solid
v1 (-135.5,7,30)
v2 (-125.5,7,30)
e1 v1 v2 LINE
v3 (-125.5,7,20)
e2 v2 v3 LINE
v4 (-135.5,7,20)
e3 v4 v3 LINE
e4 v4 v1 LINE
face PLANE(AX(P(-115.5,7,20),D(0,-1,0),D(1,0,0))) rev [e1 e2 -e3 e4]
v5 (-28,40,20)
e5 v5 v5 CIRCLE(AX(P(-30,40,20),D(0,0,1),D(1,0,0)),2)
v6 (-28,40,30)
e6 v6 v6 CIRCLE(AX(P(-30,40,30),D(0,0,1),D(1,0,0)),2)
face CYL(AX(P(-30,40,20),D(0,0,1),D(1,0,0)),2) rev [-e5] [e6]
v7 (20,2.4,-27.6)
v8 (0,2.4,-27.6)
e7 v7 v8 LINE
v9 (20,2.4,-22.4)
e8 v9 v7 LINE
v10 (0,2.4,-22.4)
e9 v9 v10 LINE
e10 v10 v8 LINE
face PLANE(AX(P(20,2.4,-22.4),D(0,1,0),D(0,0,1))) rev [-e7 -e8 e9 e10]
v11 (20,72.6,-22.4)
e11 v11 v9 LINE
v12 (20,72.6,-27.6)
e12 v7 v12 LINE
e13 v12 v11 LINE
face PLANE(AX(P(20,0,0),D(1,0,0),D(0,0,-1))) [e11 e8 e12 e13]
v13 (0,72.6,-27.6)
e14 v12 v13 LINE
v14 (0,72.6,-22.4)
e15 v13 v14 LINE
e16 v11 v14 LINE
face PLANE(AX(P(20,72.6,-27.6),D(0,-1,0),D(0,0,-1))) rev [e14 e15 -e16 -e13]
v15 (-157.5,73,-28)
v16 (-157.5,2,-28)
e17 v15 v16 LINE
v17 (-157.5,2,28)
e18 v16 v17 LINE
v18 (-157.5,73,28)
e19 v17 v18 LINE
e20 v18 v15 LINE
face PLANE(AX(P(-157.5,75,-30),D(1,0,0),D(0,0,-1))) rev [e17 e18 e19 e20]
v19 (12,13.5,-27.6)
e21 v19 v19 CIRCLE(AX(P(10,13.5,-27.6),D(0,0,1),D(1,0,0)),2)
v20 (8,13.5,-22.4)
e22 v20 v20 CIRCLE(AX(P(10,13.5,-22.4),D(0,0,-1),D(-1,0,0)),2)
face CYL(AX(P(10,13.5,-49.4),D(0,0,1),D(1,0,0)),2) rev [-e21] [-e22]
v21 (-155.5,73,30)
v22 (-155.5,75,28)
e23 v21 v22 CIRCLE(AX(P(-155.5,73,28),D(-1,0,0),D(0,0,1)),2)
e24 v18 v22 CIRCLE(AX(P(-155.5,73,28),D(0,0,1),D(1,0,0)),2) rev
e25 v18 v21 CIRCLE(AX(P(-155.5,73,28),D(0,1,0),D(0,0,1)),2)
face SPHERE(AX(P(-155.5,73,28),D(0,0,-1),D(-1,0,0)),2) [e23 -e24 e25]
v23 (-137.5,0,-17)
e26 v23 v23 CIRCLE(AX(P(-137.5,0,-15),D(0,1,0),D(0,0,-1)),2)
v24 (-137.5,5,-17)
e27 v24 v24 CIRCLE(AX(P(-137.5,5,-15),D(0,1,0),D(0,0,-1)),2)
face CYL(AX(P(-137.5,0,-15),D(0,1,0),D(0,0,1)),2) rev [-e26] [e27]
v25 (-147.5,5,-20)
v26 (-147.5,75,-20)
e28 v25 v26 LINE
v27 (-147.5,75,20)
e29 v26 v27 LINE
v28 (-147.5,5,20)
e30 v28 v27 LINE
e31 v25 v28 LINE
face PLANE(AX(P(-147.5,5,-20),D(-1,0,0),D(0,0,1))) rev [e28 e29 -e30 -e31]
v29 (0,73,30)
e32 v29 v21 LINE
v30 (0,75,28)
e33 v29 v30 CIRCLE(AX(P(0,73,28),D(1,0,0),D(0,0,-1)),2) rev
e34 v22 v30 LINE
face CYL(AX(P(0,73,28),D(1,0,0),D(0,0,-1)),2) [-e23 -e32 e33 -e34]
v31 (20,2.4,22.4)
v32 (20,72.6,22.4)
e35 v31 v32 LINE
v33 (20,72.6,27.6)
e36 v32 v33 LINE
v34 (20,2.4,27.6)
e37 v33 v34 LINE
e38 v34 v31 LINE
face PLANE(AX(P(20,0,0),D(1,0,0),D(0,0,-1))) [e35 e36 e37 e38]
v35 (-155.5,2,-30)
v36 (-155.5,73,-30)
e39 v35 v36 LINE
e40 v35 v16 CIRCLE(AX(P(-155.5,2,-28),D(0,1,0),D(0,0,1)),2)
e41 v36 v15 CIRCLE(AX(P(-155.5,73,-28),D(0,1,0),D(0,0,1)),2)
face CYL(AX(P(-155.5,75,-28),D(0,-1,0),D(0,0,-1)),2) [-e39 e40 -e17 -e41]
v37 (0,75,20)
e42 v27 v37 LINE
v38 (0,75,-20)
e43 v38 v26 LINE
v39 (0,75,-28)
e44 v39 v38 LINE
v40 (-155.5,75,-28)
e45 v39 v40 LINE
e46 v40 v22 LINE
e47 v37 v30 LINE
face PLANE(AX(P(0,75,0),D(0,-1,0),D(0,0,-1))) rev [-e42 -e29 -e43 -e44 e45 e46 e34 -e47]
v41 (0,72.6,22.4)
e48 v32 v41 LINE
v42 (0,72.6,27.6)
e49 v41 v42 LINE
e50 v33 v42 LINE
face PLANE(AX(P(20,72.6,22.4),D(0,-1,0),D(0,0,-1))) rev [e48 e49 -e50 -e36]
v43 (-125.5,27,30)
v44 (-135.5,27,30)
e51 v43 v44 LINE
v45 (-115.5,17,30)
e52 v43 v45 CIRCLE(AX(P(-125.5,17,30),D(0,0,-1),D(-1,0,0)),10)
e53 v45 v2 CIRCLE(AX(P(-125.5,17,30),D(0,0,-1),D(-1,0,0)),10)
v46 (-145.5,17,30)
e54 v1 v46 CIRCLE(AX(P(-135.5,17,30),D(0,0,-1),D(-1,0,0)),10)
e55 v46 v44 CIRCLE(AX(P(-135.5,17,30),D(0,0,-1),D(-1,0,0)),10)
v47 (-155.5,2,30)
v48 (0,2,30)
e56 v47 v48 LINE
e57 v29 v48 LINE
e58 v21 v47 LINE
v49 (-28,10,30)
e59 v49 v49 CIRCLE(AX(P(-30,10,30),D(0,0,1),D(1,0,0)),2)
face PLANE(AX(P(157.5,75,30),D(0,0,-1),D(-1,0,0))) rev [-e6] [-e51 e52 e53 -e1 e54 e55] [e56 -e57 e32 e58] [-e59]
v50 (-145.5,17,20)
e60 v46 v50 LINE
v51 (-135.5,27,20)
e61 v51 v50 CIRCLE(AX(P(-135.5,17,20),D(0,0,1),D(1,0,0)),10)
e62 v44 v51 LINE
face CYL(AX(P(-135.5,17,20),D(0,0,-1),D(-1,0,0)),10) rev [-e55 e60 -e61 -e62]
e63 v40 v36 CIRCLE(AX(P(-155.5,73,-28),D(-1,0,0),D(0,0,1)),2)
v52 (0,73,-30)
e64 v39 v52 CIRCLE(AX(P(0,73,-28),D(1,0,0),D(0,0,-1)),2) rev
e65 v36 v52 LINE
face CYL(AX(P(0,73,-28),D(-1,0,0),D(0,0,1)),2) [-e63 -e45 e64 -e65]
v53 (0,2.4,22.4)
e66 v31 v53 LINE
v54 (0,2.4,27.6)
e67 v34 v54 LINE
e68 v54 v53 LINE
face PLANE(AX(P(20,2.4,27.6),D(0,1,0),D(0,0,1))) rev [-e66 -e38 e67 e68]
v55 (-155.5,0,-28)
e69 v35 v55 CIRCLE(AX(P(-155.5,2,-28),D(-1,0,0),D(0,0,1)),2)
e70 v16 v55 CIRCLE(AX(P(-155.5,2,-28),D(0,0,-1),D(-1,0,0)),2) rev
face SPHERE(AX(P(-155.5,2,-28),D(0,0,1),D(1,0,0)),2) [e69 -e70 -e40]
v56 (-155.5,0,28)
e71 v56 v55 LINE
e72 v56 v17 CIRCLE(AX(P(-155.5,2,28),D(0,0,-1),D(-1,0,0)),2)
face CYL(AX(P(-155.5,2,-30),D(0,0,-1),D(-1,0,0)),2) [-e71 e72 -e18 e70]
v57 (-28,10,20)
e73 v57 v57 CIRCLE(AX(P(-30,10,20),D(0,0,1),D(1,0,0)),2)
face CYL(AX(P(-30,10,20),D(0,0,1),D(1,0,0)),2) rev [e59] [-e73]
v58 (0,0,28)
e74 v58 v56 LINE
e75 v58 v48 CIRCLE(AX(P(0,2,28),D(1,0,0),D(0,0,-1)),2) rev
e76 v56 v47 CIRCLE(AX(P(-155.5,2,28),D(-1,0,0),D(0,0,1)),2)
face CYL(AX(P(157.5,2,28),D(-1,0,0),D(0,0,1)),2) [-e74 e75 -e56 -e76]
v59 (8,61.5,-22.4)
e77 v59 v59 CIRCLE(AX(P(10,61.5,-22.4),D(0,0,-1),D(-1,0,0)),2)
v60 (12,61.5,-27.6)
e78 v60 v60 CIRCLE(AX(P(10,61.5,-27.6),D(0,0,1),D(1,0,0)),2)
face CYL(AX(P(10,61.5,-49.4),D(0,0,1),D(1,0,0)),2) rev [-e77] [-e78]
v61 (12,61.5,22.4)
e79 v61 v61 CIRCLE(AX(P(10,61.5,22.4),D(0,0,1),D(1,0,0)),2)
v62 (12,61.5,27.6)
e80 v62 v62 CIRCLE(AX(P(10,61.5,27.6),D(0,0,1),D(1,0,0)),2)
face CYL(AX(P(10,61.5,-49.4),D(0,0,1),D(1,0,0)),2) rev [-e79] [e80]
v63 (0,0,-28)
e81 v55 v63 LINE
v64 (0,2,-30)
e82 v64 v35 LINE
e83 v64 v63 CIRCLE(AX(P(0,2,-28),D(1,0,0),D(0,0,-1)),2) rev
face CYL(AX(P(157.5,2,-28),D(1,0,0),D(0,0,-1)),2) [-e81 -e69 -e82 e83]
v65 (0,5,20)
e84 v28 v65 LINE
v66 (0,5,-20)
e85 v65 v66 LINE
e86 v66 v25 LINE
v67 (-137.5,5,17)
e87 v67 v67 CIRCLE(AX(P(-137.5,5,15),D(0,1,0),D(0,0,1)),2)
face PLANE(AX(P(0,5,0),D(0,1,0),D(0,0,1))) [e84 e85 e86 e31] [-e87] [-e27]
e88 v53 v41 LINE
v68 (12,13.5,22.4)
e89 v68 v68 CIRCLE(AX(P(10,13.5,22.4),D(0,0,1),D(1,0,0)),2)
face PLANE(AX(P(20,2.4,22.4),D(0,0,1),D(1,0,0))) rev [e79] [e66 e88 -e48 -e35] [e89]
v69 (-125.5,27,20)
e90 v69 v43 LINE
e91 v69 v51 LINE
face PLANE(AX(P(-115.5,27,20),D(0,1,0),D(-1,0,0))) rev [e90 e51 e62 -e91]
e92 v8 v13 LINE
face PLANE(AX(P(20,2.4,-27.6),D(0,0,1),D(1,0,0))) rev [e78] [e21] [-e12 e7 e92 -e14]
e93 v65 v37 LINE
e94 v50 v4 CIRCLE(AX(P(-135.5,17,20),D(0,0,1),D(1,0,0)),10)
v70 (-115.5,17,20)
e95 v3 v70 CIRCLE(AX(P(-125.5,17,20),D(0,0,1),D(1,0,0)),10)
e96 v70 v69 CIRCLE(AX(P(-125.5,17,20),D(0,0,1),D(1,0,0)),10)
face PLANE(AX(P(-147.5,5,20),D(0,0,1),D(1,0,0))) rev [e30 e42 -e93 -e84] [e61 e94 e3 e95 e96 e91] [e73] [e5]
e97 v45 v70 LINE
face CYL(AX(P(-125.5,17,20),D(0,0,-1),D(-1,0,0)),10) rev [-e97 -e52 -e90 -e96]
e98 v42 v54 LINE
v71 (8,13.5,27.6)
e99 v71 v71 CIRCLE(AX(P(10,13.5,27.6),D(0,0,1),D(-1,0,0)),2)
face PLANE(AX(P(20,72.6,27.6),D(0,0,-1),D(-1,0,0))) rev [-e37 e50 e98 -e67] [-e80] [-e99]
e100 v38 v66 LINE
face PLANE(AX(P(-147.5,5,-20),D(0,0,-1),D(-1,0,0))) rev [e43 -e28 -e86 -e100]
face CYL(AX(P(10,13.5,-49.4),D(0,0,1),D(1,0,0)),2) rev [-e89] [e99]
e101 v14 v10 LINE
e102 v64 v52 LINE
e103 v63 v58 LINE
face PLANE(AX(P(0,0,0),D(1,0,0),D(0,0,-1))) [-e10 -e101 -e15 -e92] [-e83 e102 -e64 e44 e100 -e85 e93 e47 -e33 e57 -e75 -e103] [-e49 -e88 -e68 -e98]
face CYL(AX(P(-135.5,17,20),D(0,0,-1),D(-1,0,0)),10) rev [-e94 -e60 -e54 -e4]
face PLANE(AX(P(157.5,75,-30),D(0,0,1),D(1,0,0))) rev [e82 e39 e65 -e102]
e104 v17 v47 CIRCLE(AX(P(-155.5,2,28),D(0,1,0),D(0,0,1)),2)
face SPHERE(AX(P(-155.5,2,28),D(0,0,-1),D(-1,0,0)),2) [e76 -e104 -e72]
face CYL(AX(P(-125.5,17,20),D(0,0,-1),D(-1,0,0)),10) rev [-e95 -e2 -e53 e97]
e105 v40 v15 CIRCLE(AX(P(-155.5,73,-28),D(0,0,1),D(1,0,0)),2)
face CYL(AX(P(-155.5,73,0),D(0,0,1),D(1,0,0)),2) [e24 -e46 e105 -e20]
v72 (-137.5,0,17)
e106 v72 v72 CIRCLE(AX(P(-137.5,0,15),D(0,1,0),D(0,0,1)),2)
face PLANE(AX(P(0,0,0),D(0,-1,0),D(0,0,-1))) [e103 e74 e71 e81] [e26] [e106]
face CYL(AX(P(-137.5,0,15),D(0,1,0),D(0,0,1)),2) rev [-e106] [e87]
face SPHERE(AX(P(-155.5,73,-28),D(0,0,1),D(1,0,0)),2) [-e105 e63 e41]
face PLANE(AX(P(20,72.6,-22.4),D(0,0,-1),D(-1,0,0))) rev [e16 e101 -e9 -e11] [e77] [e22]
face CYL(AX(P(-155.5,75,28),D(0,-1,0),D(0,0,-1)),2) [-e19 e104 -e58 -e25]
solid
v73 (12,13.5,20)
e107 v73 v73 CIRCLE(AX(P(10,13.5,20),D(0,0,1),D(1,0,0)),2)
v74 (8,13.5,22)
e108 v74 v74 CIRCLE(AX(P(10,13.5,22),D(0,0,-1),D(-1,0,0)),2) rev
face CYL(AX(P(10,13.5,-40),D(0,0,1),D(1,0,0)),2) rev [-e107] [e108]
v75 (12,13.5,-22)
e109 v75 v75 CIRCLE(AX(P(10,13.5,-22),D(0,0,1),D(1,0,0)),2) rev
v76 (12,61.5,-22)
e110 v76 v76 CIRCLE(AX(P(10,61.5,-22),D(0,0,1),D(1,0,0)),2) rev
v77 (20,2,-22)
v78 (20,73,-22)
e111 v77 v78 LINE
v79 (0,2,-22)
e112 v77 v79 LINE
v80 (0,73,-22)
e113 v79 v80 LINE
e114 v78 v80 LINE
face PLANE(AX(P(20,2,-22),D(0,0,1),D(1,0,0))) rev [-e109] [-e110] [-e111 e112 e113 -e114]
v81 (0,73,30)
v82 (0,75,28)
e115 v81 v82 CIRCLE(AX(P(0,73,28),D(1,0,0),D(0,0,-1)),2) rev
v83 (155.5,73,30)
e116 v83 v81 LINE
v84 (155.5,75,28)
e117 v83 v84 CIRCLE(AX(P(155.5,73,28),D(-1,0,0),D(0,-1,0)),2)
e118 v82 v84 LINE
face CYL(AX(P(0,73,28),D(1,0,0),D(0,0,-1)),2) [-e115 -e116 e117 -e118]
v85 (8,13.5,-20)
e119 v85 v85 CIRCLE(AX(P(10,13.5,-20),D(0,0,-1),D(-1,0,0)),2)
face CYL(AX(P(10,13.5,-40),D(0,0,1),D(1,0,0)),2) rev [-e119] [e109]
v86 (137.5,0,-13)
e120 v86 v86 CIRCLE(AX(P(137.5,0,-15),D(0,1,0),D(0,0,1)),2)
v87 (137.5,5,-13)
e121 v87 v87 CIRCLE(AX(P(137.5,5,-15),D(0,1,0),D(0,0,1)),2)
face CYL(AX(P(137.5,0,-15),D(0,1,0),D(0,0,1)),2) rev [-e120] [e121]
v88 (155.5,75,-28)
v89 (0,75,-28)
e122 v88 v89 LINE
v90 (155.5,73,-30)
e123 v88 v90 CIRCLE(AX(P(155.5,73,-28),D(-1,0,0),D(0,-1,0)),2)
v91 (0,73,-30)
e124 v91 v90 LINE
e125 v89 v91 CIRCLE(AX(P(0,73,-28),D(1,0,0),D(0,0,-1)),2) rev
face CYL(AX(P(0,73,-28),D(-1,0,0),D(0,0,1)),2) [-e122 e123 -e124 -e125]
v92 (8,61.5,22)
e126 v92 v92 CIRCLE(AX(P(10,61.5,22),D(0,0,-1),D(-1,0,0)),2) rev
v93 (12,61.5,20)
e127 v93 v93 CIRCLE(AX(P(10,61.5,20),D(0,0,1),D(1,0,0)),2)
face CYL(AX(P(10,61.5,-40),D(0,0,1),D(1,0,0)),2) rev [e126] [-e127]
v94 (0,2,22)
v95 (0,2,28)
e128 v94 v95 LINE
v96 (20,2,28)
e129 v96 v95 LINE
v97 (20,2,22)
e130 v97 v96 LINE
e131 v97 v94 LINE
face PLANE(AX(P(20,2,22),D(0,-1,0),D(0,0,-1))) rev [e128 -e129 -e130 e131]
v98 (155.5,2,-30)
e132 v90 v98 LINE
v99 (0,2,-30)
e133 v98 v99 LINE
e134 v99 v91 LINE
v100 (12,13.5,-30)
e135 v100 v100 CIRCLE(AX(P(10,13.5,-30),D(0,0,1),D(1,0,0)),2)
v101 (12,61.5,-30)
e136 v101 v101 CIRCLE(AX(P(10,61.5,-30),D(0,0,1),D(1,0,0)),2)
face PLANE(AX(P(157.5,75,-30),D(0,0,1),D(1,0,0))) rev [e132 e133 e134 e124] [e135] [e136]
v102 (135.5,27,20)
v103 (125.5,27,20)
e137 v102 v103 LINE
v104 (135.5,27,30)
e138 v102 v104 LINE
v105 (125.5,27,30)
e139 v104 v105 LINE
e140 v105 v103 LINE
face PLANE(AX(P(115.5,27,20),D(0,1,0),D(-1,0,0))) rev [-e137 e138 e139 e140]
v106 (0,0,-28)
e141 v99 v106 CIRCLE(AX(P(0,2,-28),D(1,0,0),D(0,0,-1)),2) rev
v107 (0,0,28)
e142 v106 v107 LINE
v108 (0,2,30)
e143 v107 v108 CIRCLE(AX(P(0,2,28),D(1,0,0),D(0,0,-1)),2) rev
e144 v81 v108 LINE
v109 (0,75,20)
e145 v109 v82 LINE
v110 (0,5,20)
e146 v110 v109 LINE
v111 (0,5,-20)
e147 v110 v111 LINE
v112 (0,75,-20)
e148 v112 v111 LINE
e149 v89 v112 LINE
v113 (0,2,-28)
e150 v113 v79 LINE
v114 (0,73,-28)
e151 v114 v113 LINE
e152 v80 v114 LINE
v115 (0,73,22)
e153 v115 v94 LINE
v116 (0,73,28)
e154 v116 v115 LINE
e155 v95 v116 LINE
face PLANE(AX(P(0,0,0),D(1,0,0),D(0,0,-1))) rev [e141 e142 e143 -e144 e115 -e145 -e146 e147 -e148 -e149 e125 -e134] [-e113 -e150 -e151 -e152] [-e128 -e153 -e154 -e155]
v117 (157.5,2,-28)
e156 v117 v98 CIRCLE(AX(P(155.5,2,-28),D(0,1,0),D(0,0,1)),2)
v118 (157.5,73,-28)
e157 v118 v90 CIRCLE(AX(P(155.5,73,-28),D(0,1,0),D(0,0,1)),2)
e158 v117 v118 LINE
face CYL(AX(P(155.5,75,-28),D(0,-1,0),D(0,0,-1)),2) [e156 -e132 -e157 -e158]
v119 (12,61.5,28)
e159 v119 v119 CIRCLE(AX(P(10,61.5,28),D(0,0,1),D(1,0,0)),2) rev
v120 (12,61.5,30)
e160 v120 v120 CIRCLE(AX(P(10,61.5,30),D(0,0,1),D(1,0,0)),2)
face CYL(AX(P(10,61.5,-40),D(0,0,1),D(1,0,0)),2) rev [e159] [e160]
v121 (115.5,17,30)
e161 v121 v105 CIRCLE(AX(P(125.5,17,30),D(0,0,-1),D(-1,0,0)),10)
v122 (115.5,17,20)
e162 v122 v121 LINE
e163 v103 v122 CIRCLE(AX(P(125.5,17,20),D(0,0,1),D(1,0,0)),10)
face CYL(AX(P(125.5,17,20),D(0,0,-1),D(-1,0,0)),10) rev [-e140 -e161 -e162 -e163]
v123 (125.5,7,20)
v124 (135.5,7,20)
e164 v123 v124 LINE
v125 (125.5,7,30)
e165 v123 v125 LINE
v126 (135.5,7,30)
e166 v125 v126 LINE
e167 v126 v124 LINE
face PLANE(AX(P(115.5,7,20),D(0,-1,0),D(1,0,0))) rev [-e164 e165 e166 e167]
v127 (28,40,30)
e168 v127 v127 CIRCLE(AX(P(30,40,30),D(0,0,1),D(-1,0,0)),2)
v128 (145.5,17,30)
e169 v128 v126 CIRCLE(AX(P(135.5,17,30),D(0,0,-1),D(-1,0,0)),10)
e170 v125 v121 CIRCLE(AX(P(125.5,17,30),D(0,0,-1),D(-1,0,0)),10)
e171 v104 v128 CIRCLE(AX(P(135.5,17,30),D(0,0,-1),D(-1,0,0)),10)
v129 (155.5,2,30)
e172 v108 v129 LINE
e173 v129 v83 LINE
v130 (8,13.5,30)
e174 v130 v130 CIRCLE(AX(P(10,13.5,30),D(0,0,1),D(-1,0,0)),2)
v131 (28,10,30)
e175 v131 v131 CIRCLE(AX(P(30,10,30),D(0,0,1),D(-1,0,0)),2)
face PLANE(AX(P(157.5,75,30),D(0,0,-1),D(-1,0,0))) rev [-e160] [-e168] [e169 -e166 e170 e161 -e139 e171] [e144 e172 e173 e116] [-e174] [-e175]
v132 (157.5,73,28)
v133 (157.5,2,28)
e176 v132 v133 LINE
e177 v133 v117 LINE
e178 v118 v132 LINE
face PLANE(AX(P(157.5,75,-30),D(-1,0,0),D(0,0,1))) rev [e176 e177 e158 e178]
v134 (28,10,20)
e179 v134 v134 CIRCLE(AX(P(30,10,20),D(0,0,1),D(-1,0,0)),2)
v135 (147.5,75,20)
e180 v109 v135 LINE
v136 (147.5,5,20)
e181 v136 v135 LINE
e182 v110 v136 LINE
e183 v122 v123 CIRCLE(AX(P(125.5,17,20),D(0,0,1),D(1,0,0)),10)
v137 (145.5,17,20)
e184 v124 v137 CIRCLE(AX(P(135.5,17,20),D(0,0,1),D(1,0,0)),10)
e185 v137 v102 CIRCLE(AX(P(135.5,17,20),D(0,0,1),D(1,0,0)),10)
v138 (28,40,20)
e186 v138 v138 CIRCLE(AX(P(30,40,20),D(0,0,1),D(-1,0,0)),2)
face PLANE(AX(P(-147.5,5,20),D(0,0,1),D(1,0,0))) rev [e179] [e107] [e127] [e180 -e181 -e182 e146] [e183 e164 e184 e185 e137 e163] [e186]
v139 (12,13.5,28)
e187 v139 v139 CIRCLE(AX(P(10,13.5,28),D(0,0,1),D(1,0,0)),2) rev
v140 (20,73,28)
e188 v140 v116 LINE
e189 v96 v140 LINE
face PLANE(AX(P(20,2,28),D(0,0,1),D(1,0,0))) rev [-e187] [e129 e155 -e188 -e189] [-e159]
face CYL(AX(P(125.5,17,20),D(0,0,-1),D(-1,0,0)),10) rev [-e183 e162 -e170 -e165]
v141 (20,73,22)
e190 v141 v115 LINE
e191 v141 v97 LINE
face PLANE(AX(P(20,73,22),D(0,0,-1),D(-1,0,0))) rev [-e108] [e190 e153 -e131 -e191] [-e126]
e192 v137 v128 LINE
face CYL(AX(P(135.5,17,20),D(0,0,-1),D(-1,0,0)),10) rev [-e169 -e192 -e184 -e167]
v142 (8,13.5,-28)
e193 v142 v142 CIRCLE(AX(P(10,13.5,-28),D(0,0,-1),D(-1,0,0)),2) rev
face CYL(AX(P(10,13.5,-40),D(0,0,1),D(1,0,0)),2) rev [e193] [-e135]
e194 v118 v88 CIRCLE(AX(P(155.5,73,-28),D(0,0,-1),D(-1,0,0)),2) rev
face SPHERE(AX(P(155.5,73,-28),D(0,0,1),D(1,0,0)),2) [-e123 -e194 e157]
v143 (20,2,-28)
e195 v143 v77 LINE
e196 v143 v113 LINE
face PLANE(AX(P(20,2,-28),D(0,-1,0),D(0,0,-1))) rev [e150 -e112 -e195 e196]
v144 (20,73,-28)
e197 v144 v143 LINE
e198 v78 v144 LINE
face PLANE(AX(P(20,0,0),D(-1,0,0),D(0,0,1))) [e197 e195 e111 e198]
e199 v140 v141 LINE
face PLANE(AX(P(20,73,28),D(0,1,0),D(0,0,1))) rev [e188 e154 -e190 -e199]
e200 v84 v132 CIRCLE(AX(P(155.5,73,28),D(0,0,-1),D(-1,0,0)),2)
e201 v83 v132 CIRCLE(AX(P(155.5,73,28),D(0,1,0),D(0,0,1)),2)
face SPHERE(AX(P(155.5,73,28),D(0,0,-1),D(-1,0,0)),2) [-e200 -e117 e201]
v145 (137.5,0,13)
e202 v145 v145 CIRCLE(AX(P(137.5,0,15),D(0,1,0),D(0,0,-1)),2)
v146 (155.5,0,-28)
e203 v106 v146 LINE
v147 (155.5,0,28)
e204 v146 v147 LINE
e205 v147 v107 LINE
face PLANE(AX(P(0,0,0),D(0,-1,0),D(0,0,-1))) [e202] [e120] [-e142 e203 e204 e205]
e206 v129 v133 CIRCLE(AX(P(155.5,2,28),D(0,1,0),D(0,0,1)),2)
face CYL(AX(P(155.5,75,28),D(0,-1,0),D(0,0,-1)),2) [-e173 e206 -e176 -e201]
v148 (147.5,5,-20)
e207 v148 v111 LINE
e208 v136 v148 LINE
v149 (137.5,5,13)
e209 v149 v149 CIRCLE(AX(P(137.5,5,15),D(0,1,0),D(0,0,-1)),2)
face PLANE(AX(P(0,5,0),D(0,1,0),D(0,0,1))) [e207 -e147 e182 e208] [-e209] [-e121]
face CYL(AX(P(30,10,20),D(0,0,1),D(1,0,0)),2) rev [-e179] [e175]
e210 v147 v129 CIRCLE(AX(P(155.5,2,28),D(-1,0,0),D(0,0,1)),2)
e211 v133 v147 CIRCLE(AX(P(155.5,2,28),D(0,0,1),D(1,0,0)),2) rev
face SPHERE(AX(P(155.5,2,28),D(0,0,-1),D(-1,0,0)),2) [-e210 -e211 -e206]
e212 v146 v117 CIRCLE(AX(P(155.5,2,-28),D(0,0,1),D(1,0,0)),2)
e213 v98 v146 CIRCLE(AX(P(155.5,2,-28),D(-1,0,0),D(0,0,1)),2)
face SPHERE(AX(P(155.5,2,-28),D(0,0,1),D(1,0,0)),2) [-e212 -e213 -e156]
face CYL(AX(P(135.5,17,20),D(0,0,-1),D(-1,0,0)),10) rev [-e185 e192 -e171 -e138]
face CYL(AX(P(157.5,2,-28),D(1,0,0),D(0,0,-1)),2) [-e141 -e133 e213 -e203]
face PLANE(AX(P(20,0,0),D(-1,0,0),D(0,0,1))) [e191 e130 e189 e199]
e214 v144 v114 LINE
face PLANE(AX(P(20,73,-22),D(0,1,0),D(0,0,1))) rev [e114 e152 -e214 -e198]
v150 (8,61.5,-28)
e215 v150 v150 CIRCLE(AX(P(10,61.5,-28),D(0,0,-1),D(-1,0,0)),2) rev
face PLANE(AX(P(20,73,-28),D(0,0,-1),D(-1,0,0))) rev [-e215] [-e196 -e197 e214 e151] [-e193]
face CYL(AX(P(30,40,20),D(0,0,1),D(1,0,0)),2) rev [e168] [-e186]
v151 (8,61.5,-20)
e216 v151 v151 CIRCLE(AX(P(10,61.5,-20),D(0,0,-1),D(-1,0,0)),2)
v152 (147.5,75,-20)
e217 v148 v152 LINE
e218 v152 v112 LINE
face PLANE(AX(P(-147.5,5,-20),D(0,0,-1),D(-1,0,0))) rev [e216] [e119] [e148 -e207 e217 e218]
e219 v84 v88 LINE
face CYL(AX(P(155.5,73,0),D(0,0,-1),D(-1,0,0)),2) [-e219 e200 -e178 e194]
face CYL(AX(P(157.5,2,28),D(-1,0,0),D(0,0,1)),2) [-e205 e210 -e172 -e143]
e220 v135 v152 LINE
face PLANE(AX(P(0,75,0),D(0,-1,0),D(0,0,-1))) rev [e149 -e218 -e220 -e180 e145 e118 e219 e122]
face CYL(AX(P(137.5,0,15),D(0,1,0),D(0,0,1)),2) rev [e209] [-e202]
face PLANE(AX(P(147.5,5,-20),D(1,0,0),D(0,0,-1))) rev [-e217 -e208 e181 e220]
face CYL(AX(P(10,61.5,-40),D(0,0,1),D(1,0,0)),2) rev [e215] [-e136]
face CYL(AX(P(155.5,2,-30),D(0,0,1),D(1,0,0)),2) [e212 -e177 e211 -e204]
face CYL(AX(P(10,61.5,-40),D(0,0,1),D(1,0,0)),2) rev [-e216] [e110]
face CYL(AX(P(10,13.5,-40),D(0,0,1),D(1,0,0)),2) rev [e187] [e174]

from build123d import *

# Parameters (mm, degrees)
SKETCH1_W           = 315
SKETCH1_H           = 60
BOSS_EXTRUDE1_DEPTH = 75
SKETCH2_W           = 295
SKETCH2_H           = 40
CUT_EXTRUDE1_DEPTH  = 70
FILLET1_R           = 2
FILLET2_R           = 2
SKETCH4_R           = 2
CUT_EXTRUDE3_DEPTH  = 70
SKETCH5_W           = 6
SKETCH5_H           = 71
CUT_EXTRUDE4_DEPTH  = 20
SKETCH6_W           = 5.2
SKETCH6_H           = 70.2
BOSS_EXTRUDE2_DEPTH = 20
SKETCH7_R           = 2
CUT_EXTRUDE5_DEPTH  = 77
SKETCH8_R           = 2
CUT_EXTRUDE6_DEPTH  = 175.946420369
SKETCH11_R          = 2
CUT_EXTRUDE7_DEPTH  = 10
SKETCH13_W          = 30
SKETCH13_H          = 20
CUT_EXTRUDE9_DEPTH  = 10
FILLET4_R           = 10
FILLET5_R           = 10


with BuildPart() as part:
    # Sketch1 → Boss-Extrude1 (new body)
    with BuildSketch(Plane(origin=(0, 0, 0), x_dir=(1, 0, 0), z_dir=(0, 1, 0))):
        Rectangle(SKETCH1_W, SKETCH1_H)
    extrude(amount=BOSS_EXTRUDE1_DEPTH)

    # Sketch2 → Cut-Extrude1 (cut)
    with BuildSketch(Plane(origin=(0, 75, 0), x_dir=(1, 0, 0), z_dir=(0, 1, 0))):
        Rectangle(SKETCH2_W, SKETCH2_H)
    extrude(amount=-CUT_EXTRUDE1_DEPTH, mode=Mode.SUBTRACT)

    # Fillet1
    fillet1_edges = [part.edges().sort_by_distance(p)[0] for p in [
        (157.5, 75, 0),
        (-157.5, 75, 0),
        (157.5, 0, 0),
        (-157.5, 0, 0),
    ]]
    fillet(fillet1_edges, radius=FILLET1_R)

    # Fillet2
    fillet2_edges = [part.edges().sort_by_distance(p)[0] for p in [
        (157.5, 37.5, -30),
        (157.5, 37.5, 30),
        (0, 0, -30),
        (-157.5, 37.5, -30),
        (0, 75, -30),
        (-156.914213562, 74.414213562, -30),
        (-156.914213562, 0.585786438, -30),
        (156.914213562, 74.414213562, -30),
        (156.914213562, 0.585786438, -30),
        (0, 0, 30),
        (0, 75, 30),
        (-157.5, 37.5, 30),
        (-156.914213562, 74.414213562, 30),
        (-156.914213562, 0.585786438, 30),
        (156.914213562, 74.414213562, 30),
        (156.914213562, 0.585786438, 30),
    ]]
    fillet(fillet2_edges, radius=FILLET2_R)


with BuildPart() as body_2:
    # Split1: the piece on the far side of the plane
    add(part.part)
    split(bisect_by=Plane(origin=(0, 0, 0), x_dir=(0, 0, 1), z_dir=(1, 0, 0)), keep=Keep.BOTTOM)

    # Sketch6 → Boss-Extrude2 (add)
    with BuildSketch(Plane(origin=(0, 0, 0), x_dir=(0, 0, -1), z_dir=(1, 0, 0))):
        with Locations((-25, 37.5)):
            Rectangle(SKETCH6_W, SKETCH6_H)
        with Locations((25, 37.5)):
            Rectangle(SKETCH6_W, SKETCH6_H)
    extrude(amount=BOSS_EXTRUDE2_DEPTH)

    # Sketch7 → Cut-Extrude5 (cut)
    with BuildSketch(Plane.XY.offset(27.6)):
        with Locations((10, 61.5)):
            Circle(SKETCH7_R)
        with Locations((10, 13.5)):
            Circle(SKETCH7_R)
    extrude(amount=-CUT_EXTRUDE5_DEPTH, mode=Mode.SUBTRACT)


with BuildPart() as part_1:
    add(part.part)

    # Split1
    split(bisect_by=Plane(origin=(0, 0, 0), x_dir=(0, 0, 1), z_dir=(1, 0, 0)), keep=Keep.TOP)

    # Sketch4 → Cut-Extrude3 (cut)
    with BuildSketch(Plane.XY.offset(30)):
        with Locations((10, 61.5)):
            Circle(SKETCH4_R)
        with Locations((10, 13.5)):
            Circle(SKETCH4_R)
    extrude(amount=-CUT_EXTRUDE3_DEPTH, mode=Mode.SUBTRACT)

    # Sketch5 → Cut-Extrude4 (cut)
    with BuildSketch(Plane.ZY):
        with Locations((-25, 37.5)):
            Rectangle(SKETCH5_W, SKETCH5_H)
        with Locations((25, 37.5)):
            Rectangle(SKETCH5_W, SKETCH5_H)
    extrude(amount=-CUT_EXTRUDE4_DEPTH, mode=Mode.SUBTRACT)


with BuildPart() as cut_extrude6_tool:
    # Sketch8 → Cut-Extrude6 (new, through all)
    with BuildSketch(Plane(origin=(0, 5, 0), x_dir=(1, 0, 0), z_dir=(0, 1, 0))):
        with Locations(Location((137.5, 15, 0), (0, 0, 270))):
            Circle(SKETCH8_R)
        with Locations(Location((137.5, -15, 0), (0, 0, 90))):
            Circle(SKETCH8_R)
        with Locations(Location((-137.5, -15, 0), (0, 0, 270))):
            Circle(SKETCH8_R)
        with Locations(Location((-137.5, 15, 0), (0, 0, 90))):
            Circle(SKETCH8_R)
    extrude(amount=-CUT_EXTRUDE6_DEPTH)


with BuildPart() as part_2:
    add(part_1.part)

    # Cut-Extrude6: cut by cut_extrude6_tool
    add(cut_extrude6_tool.part, mode=Mode.SUBTRACT)


with BuildPart() as body_2_1:
    add(body_2.part)

    # Cut-Extrude6: cut by cut_extrude6_tool
    add(cut_extrude6_tool.part, mode=Mode.SUBTRACT)


with BuildPart() as cut_extrude7_tool:
    # Sketch11 → Cut-Extrude7 (new body)
    with BuildSketch(Plane.XY.offset(30)):
        with Locations((-30, 10)):
            Circle(SKETCH11_R)
        with Locations((-30, 40)):
            Circle(SKETCH11_R)
        with Locations(Location((30, 10, 0), (0, 0, 180))):
            Circle(SKETCH11_R)
        with Locations(Location((30, 40, 0), (0, 0, 180))):
            Circle(SKETCH11_R)
    extrude(amount=-CUT_EXTRUDE7_DEPTH)


with BuildPart() as part_3:
    add(part_2.part)

    # Cut-Extrude7: cut by cut_extrude7_tool
    add(cut_extrude7_tool.part, mode=Mode.SUBTRACT)


with BuildPart() as body_2_2:
    add(body_2_1.part)

    # Cut-Extrude7: cut by cut_extrude7_tool
    add(cut_extrude7_tool.part, mode=Mode.SUBTRACT)


with BuildPart() as cut_extrude9_tool:
    # Sketch13 → Cut-Extrude9 (new body)
    with BuildSketch(Plane.XY.offset(30)):
        with Locations((130.5, 17)):
            Rectangle(SKETCH13_W, SKETCH13_H)
        with Locations((-130.5, 17)):
            Rectangle(SKETCH13_W, SKETCH13_H)
    extrude(amount=-CUT_EXTRUDE9_DEPTH)


with BuildPart() as part_4:
    add(part_3.part)

    # Cut-Extrude9: cut by cut_extrude9_tool
    add(cut_extrude9_tool.part, mode=Mode.SUBTRACT)

    # Fillet5
    fillet5_edges = [part_4.edges().sort_by_distance(p)[0] for p in [
        (145.5, 27, 25),
        (115.5, 7, 25),
        (145.5, 7, 25),
        (115.5, 27, 25),
    ]]
    fillet(fillet5_edges, radius=FILLET5_R - 0.0001)  # a hair under: the kernel refuses the full size


with BuildPart() as body_2_3:
    add(body_2_2.part)

    # Cut-Extrude9: cut by cut_extrude9_tool
    add(cut_extrude9_tool.part, mode=Mode.SUBTRACT)

    # Fillet4
    fillet4_edges = [body_2_3.edges().sort_by_distance(p)[0] for p in [
        (-115.5, 7, 25),
        (-115.5, 27, 25),
        (-145.5, 27, 25),
        (-145.5, 7, 25),
    ]]
    fillet(fillet4_edges, radius=FILLET4_R - 0.0001)  # a hair under: the kernel refuses the full size


solid = Compound([part_4.part, body_2_3.part])
